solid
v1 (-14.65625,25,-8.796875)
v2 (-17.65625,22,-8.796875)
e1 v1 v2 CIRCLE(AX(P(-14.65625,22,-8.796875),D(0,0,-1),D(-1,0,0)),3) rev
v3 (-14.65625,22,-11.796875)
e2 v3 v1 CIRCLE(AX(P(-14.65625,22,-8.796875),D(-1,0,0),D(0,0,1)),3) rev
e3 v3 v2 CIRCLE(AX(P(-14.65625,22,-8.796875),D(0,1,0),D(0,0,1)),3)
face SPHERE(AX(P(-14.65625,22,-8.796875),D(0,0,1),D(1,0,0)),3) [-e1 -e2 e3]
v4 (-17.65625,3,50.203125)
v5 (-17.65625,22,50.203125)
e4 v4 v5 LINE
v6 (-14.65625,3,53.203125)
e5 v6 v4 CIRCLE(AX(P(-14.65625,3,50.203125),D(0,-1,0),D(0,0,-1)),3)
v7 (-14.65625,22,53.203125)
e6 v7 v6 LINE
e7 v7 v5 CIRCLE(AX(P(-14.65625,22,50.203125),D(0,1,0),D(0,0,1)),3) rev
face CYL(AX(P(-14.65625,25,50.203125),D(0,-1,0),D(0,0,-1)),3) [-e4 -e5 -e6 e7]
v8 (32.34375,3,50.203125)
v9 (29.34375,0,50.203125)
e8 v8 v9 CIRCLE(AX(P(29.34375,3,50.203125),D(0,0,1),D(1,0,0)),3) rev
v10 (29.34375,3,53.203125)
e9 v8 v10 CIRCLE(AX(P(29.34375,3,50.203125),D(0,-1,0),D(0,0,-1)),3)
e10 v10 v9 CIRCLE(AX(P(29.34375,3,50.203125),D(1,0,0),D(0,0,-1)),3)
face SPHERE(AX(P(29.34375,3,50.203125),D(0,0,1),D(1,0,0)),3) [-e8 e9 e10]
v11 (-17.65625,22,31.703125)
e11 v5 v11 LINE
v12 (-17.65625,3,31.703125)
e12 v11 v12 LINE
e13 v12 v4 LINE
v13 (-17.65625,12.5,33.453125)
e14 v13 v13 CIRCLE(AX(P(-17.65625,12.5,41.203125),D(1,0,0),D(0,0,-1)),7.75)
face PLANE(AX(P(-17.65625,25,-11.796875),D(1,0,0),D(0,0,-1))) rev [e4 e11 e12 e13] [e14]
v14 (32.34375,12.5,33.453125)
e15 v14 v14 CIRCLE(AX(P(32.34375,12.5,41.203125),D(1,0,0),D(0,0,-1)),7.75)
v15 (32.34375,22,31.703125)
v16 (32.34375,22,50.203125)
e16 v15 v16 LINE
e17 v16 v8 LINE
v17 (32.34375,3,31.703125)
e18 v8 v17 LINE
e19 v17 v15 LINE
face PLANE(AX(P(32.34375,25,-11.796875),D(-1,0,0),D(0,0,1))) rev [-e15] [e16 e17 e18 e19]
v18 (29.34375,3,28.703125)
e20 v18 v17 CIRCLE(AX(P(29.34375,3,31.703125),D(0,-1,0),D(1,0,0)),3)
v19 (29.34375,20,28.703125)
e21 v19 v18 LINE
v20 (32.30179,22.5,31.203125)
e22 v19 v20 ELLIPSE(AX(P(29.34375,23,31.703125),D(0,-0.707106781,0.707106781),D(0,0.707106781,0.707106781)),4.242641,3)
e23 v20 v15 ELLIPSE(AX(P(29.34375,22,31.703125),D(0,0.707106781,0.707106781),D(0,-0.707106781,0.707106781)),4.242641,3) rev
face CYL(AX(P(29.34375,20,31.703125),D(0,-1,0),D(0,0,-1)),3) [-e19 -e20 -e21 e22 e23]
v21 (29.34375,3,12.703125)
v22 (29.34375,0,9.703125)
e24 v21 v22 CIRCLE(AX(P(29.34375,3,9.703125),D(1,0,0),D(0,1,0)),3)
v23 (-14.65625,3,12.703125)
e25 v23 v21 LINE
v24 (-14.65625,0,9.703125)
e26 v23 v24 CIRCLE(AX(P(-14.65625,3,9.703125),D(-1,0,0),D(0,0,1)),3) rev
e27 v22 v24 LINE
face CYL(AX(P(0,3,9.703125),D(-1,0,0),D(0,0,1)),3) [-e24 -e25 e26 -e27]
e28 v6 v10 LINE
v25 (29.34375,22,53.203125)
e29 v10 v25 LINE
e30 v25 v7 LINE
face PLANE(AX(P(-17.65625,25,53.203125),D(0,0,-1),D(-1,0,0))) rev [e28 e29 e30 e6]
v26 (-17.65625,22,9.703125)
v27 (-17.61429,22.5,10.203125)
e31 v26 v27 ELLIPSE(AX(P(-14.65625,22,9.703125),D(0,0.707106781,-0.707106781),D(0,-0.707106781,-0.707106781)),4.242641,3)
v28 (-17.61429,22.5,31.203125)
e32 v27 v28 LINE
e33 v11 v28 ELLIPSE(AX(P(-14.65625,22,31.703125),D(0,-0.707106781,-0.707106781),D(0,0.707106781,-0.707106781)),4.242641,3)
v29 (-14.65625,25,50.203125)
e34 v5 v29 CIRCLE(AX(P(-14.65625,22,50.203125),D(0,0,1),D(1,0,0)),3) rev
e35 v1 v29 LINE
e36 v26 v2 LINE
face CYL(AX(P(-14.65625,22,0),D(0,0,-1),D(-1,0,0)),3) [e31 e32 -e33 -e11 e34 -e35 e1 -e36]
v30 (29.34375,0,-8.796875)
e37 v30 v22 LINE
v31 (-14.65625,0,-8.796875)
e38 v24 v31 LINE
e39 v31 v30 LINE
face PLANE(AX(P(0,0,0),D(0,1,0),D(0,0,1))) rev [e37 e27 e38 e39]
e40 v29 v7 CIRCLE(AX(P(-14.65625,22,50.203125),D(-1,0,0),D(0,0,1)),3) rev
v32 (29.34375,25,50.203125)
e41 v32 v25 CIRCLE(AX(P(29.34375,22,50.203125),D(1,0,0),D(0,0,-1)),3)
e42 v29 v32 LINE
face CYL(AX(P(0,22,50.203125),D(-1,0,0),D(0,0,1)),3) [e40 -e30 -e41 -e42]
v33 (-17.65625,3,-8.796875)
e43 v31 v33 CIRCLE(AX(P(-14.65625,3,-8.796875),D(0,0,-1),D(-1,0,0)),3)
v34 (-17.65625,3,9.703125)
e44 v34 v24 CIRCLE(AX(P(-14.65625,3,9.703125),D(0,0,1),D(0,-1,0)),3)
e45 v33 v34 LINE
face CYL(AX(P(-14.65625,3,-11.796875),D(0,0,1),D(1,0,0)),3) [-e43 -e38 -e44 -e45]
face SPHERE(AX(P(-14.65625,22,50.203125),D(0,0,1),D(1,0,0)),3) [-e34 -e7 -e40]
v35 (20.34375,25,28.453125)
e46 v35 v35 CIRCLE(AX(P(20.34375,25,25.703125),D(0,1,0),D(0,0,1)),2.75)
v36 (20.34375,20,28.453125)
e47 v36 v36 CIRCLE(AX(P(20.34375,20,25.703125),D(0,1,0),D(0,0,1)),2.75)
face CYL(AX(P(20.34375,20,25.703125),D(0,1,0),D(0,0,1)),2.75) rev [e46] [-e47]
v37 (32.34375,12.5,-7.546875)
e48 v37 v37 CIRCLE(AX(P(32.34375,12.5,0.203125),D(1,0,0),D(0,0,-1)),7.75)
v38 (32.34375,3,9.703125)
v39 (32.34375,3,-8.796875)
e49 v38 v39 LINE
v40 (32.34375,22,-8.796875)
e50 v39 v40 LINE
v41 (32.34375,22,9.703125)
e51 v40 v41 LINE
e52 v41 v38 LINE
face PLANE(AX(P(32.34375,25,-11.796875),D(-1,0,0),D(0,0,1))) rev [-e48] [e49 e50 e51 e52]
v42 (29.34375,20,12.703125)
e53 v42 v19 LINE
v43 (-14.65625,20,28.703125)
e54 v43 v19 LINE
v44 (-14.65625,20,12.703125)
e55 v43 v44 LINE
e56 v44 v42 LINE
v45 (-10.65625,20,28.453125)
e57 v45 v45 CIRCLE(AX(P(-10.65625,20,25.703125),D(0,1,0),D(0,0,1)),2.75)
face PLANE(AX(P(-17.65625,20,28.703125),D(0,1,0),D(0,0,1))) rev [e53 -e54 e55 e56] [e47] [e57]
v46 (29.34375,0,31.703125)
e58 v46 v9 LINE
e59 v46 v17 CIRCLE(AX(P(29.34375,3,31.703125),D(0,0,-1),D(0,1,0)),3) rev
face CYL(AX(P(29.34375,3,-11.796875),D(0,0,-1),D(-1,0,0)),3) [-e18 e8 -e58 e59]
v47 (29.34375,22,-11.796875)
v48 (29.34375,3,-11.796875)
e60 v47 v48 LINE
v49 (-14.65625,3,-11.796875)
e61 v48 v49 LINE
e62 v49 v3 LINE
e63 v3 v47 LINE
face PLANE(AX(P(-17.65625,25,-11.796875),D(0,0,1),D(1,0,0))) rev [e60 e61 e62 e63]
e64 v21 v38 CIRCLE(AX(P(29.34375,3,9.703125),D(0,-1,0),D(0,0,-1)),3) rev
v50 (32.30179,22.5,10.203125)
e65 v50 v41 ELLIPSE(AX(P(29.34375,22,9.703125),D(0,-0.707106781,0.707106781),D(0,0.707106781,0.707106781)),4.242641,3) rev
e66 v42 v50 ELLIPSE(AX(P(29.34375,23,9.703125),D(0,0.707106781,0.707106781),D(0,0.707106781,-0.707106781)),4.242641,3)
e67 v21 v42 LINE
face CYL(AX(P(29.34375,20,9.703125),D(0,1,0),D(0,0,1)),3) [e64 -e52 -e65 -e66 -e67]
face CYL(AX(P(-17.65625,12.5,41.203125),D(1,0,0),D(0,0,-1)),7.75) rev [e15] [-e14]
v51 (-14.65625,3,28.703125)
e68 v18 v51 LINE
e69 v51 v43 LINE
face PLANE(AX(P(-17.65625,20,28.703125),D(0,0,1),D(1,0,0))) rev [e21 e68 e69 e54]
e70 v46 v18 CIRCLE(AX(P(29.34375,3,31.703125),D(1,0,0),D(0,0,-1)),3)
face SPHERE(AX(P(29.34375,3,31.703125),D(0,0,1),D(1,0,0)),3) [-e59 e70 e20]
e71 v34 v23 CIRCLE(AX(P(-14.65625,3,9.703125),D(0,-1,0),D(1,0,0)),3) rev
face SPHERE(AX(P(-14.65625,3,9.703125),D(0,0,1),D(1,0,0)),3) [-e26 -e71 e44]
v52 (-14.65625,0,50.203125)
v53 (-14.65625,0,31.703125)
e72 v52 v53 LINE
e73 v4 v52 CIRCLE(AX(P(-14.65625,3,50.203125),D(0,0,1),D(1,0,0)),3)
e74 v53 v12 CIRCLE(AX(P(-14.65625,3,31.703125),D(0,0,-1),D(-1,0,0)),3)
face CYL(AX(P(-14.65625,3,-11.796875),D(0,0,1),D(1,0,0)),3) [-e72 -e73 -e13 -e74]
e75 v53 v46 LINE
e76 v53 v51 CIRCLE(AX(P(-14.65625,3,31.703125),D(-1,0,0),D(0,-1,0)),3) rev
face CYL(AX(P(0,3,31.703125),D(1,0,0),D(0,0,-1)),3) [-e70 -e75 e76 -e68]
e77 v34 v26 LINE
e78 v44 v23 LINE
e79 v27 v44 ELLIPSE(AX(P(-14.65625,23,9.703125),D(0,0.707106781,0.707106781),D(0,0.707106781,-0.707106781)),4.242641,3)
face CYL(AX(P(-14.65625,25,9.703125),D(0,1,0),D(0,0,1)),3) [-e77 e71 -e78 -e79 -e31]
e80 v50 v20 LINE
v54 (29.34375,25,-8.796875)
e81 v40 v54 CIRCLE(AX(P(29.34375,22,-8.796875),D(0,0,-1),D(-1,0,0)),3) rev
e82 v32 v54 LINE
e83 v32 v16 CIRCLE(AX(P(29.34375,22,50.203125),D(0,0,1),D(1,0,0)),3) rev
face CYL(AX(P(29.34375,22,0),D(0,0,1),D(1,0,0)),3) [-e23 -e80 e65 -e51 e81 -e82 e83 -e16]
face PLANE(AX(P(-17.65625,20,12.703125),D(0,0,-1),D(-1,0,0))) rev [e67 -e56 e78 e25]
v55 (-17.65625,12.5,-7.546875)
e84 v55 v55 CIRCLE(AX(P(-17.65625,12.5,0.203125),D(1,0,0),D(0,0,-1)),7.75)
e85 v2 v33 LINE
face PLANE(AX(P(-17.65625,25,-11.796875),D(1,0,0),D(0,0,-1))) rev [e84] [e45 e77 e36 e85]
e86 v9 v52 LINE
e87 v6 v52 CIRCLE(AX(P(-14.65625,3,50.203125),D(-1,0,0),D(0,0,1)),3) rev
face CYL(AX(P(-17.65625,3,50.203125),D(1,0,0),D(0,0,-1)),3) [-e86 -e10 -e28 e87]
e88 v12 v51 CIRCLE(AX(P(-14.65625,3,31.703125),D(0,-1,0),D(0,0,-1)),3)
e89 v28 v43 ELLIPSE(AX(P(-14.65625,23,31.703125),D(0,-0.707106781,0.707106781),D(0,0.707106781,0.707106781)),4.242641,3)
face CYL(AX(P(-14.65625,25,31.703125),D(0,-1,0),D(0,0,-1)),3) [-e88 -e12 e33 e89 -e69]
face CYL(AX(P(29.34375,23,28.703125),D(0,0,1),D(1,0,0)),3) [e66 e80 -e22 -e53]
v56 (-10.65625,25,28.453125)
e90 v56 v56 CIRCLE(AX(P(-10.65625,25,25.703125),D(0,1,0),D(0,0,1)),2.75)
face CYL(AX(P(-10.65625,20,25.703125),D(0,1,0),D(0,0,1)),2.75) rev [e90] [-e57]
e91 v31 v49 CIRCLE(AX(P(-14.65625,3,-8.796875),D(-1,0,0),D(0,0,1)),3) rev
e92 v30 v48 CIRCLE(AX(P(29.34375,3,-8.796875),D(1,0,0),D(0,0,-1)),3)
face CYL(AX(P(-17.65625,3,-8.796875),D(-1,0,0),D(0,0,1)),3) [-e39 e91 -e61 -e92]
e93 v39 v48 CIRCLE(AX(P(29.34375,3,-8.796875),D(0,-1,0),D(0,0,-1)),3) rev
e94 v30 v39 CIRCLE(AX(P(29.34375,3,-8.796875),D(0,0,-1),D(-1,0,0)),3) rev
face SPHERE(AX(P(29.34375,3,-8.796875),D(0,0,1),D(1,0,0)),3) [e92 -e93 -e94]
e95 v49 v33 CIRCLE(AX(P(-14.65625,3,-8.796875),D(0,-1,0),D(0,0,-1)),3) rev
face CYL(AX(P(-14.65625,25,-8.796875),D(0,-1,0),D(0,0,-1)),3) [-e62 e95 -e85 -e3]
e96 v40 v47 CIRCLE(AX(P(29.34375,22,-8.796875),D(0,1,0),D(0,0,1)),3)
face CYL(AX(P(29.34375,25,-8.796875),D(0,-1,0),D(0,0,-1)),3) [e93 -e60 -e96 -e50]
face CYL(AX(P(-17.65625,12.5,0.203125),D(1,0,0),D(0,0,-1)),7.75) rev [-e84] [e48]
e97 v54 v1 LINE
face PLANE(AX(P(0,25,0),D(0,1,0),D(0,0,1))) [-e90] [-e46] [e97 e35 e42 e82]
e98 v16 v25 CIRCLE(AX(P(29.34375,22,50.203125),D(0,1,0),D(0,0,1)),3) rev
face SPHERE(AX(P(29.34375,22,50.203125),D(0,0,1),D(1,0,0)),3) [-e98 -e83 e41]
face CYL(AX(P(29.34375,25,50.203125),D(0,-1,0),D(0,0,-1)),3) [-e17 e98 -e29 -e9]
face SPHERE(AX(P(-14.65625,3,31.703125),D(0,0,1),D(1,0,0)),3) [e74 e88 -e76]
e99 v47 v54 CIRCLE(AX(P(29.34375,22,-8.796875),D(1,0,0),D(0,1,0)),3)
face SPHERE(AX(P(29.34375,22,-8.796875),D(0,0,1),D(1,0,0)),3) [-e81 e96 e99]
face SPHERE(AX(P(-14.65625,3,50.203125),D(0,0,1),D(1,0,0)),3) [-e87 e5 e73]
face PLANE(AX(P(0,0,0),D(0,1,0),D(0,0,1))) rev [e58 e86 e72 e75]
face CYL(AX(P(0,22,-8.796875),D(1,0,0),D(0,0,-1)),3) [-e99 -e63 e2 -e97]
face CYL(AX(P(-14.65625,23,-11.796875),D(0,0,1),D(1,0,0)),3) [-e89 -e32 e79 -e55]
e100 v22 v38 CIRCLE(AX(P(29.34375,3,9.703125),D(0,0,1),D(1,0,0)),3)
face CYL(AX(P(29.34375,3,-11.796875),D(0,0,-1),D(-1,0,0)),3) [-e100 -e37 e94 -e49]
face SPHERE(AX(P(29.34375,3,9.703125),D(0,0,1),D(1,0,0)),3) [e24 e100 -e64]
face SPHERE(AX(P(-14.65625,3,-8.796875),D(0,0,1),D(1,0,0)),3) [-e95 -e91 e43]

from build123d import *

# Parameters (mm, degrees)
SKETCH_1_W          = 50
SKETCH_1_H          = 65
EXTRUDE_1_DEPTH     = 25
SKETCH_2_R          = 7.75
SKETCH_2_W          = 16
SKETCH_2_H          = 21.892598188
CUT_EXTRUDE_1_DEPTH = 78.172355865
SKETCH_4_R          = 2.75
CUT_EXTRUDE_3_DEPTH = 5
FILLET_1_R          = 3


with BuildPart() as part:
    # 草图1 → 凸台-拉伸1 (new body)
    with BuildSketch(Plane(origin=(0, 0, 0), x_dir=(1, 0, 0), z_dir=(0, 1, 0))):
        with Locations((7.34375, -20.703125)):
            Rectangle(SKETCH_1_W, SKETCH_1_H)
    extrude(amount=EXTRUDE_1_DEPTH)

    # 草图2 → 切除-拉伸1 (cut, through all)
    with BuildSketch(Plane(origin=(32.34375, 0, 0), x_dir=(0, 0, -1), z_dir=(1, 0, 0))):
        with Locations((-41.203125, 12.5)):
            Circle(SKETCH_2_R)
        with Locations((-0.203125, 12.5)):
            Circle(SKETCH_2_R)
        with Locations((-20.703125, 9.053700906)):
            Rectangle(SKETCH_2_W, SKETCH_2_H)
    extrude(amount=-CUT_EXTRUDE_1_DEPTH, mode=Mode.SUBTRACT)

    # 草图4 → 切除-拉伸3 (cut)
    with BuildSketch(Plane(origin=(0, 25, 0), x_dir=(1, 0, 0), z_dir=(0, 1, 0))):
        with Locations(Location((20.34375, -25.703125, 0), (0, 0, 270))):
            Circle(SKETCH_4_R)
        with Locations(Location((-10.65625, -25.703125, 0), (0, 0, 270))):
            Circle(SKETCH_4_R)
    extrude(amount=-CUT_EXTRUDE_3_DEPTH, mode=Mode.SUBTRACT)

    # 圆角1
    # the kernel refuses this fillet: 3 mm, written as the material it takes off along each edge
    with BuildSketch(Plane(origin=(29.34375, 22, -8.796875), x_dir=(1, 0, 0), z_dir=(0, 0, -1))) as fillet_1_piece_1_section:
        Polygon((0, 0), (FILLET_1_R, 0), (FILLET_1_R, -FILLET_1_R), (0, -FILLET_1_R), align=None)
    fillet_1_piece_1 = extrude(amount=FILLET_1_R, mode=Mode.PRIVATE)
    fillet_1_piece_1 = fillet_1_piece_1 - Plane(origin=(29.34375, 22, -8.796875), x_dir=(-0.7071067811865475, -0.7071067811865475, 0), z_dir=(0, 0, -1)) * Sphere(FILLET_1_R, mode=Mode.PRIVATE)
    add(fillet_1_piece_1, mode=Mode.SUBTRACT)
    with BuildSketch(Plane(origin=(29.34375, 22, 50.203125), x_dir=(1, 0, 0), z_dir=(0, 0, 1))) as fillet_1_piece_2_section:
        Polygon((0, 0), (FILLET_1_R, 0), (FILLET_1_R, FILLET_1_R), (0, FILLET_1_R), align=None)
    fillet_1_piece_2 = extrude(amount=FILLET_1_R, mode=Mode.PRIVATE)
    fillet_1_piece_2 = fillet_1_piece_2 - Plane(origin=(29.34375, 22, 50.203125), x_dir=(-0.7071067811865475, -0.7071067811865475, 0), z_dir=(0, 0, 1)) * Sphere(FILLET_1_R, mode=Mode.PRIVATE)
    add(fillet_1_piece_2, mode=Mode.SUBTRACT)
    with BuildSketch(Plane(origin=(-14.65625, 22, -8.796875), x_dir=(-1, 0, 0), z_dir=(0, 0, -1))) as fillet_1_piece_3_section:
        Polygon((0, 0), (FILLET_1_R, 0), (FILLET_1_R, FILLET_1_R), (0, FILLET_1_R), align=None)
    fillet_1_piece_3 = extrude(amount=FILLET_1_R, mode=Mode.PRIVATE)
    fillet_1_piece_3 = fillet_1_piece_3 - Plane(origin=(-14.65625, 22, -8.796875), x_dir=(0.7071067811865475, -0.7071067811865475, 0), z_dir=(0, 0, -1)) * Sphere(FILLET_1_R, mode=Mode.PRIVATE)
    add(fillet_1_piece_3, mode=Mode.SUBTRACT)
    with BuildSketch(Plane(origin=(-14.65625, 3, 50.203125), x_dir=(0, -1, 0), z_dir=(-1, 0, 0))) as fillet_1_piece_4_section:
        Polygon((0, 0), (FILLET_1_R, 0), (FILLET_1_R, FILLET_1_R), (0, FILLET_1_R), align=None)
    fillet_1_piece_4 = extrude(amount=FILLET_1_R, mode=Mode.PRIVATE)
    fillet_1_piece_4 = fillet_1_piece_4 - Plane(origin=(-14.65625, 3, 50.203125), x_dir=(0, 0.7071067811865475, -0.7071067811865475), z_dir=(-1, 0, 0)) * Sphere(FILLET_1_R, mode=Mode.PRIVATE)
    add(fillet_1_piece_4, mode=Mode.SUBTRACT)
    with BuildSketch(Plane(origin=(-14.65625, 3, 31.703125), x_dir=(0, -1, 0), z_dir=(-1, 0, 0))) as fillet_1_piece_5_section:
        Polygon((0, 0), (FILLET_1_R, 0), (FILLET_1_R, -FILLET_1_R), (0, -FILLET_1_R), align=None)
    fillet_1_piece_5 = extrude(amount=FILLET_1_R, mode=Mode.PRIVATE)
    fillet_1_piece_5 = fillet_1_piece_5 - Plane(origin=(-14.65625, 3, 31.703125), x_dir=(0, 0.7071067811865475, 0.7071067811865475), z_dir=(-1, 0, 0)) * Sphere(FILLET_1_R, mode=Mode.PRIVATE)
    add(fillet_1_piece_5, mode=Mode.SUBTRACT)
    with BuildSketch(Plane(origin=(29.34375, 3, -8.796875), x_dir=(1, 0, 0), z_dir=(0, 0, -1))) as fillet_1_piece_6_section:
        Polygon((0, 0), (FILLET_1_R, 0), (FILLET_1_R, FILLET_1_R), (0, FILLET_1_R), align=None)
    fillet_1_piece_6 = extrude(amount=FILLET_1_R, mode=Mode.PRIVATE)
    fillet_1_piece_6 = fillet_1_piece_6 - Plane(origin=(29.34375, 3, -8.796875), x_dir=(-0.7071067811865475, 0.7071067811865475, 0), z_dir=(0, 0, -1)) * Sphere(FILLET_1_R, mode=Mode.PRIVATE)
    add(fillet_1_piece_6, mode=Mode.SUBTRACT)
    with BuildSketch(Plane(origin=(29.34375, 3, 9.703125), x_dir=(1, 0, 0), z_dir=(0, 0, 1))) as fillet_1_piece_7_section:
        Polygon((0, 0), (FILLET_1_R, 0), (FILLET_1_R, -FILLET_1_R), (0, -FILLET_1_R), align=None)
    fillet_1_piece_7 = extrude(amount=FILLET_1_R, mode=Mode.PRIVATE)
    fillet_1_piece_7 = fillet_1_piece_7 - Plane(origin=(29.34375, 3, 9.703125), x_dir=(-0.7071067811865475, 0.7071067811865475, 0), z_dir=(0, 0, 1)) * Sphere(FILLET_1_R, mode=Mode.PRIVATE)
    add(fillet_1_piece_7, mode=Mode.SUBTRACT)
    with BuildSketch(Plane(origin=(29.34375, 3, 31.703125), x_dir=(0, -1, 0), z_dir=(1, 0, 0))) as fillet_1_piece_8_section:
        Polygon((0, 0), (FILLET_1_R, 0), (FILLET_1_R, FILLET_1_R), (0, FILLET_1_R), align=None)
    fillet_1_piece_8 = extrude(amount=FILLET_1_R, mode=Mode.PRIVATE)
    fillet_1_piece_8 = fillet_1_piece_8 - Plane(origin=(29.34375, 3, 31.703125), x_dir=(0, 0.7071067811865475, 0.7071067811865475), z_dir=(1, 0, 0)) * Sphere(FILLET_1_R, mode=Mode.PRIVATE)
    add(fillet_1_piece_8, mode=Mode.SUBTRACT)
    with BuildSketch(Plane(origin=(-14.65625, 3, 9.703125), x_dir=(-1, 0, 0), z_dir=(0, 0, 1))) as fillet_1_piece_9_section:
        Polygon((0, 0), (FILLET_1_R, 0), (FILLET_1_R, FILLET_1_R), (0, FILLET_1_R), align=None)
    fillet_1_piece_9 = extrude(amount=FILLET_1_R, mode=Mode.PRIVATE)
    fillet_1_piece_9 = fillet_1_piece_9 - Plane(origin=(-14.65625, 3, 9.703125), x_dir=(0.7071067811865475, 0.7071067811865475, 0), z_dir=(0, 0, 1)) * Sphere(FILLET_1_R, mode=Mode.PRIVATE)
    add(fillet_1_piece_9, mode=Mode.SUBTRACT)
    with BuildSketch(Plane(origin=(-14.65625, 22, 50.203125), x_dir=(0, 1, 0), z_dir=(-1, 0, 0))) as fillet_1_piece_10_section:
        Polygon((0, 0), (FILLET_1_R, 0), (FILLET_1_R, -FILLET_1_R), (0, -FILLET_1_R), align=None)
    fillet_1_piece_10 = extrude(amount=FILLET_1_R, mode=Mode.PRIVATE)
    fillet_1_piece_10 = fillet_1_piece_10 - Plane(origin=(-14.65625, 22, 50.203125), x_dir=(0, -0.7071067811865475, -0.7071067811865475), z_dir=(-1, 0, 0)) * Sphere(FILLET_1_R, mode=Mode.PRIVATE)
    add(fillet_1_piece_10, mode=Mode.SUBTRACT)
    with BuildSketch(Plane(origin=(-14.65625, 3, -8.796875), x_dir=(-1, 0, 0), z_dir=(0, 0, -1))) as fillet_1_piece_11_section:
        Polygon((0, 0), (FILLET_1_R, 0), (FILLET_1_R, -FILLET_1_R), (0, -FILLET_1_R), align=None)
    fillet_1_piece_11 = extrude(amount=FILLET_1_R, mode=Mode.PRIVATE)
    fillet_1_piece_11 = fillet_1_piece_11 - Plane(origin=(-14.65625, 3, -8.796875), x_dir=(0.7071067811865475, 0.7071067811865475, 0), z_dir=(0, 0, -1)) * Sphere(FILLET_1_R, mode=Mode.PRIVATE)
    add(fillet_1_piece_11, mode=Mode.SUBTRACT)
    with BuildSketch(Plane(origin=(29.34375, 3, 50.203125), x_dir=(1, 0, 0), z_dir=(0, 0, 1))) as fillet_1_piece_12_section:
        Polygon((0, 0), (FILLET_1_R, 0), (FILLET_1_R, -FILLET_1_R), (0, -FILLET_1_R), align=None)
    fillet_1_piece_12 = extrude(amount=FILLET_1_R, mode=Mode.PRIVATE)
    fillet_1_piece_12 = fillet_1_piece_12 - Plane(origin=(29.34375, 3, 50.203125), x_dir=(-0.7071067811865475, 0.7071067811865475, 0), z_dir=(0, 0, 1)) * Sphere(FILLET_1_R, mode=Mode.PRIVATE)
    add(fillet_1_piece_12, mode=Mode.SUBTRACT)
    with BuildSketch(Plane(origin=(32.34375, 25, -8.796875), x_dir=(0, -1, 0), z_dir=(0, 0, 1)), Plane(origin=(-17.65625, 25, 50.203125), x_dir=(0, -1, 0), z_dir=(0, 0, -1))) as fillet_1_piece_13:
        with BuildLine():
            CenterArc((FILLET_1_R, -FILLET_1_R), FILLET_1_R, 90, 90)
            Line((0, -FILLET_1_R), (0, 0))
            Line((0, 0), (FILLET_1_R, 0))
        make_face()
    extrude(amount=59, mode=Mode.SUBTRACT)
    with BuildSketch(Plane(origin=(-14.65625, 25, -11.796875), x_dir=(0, -1, 0), z_dir=(1, 0, 0)), Plane(origin=(-14.65625, 0, 28.703125), x_dir=(0, 0, 1), z_dir=(1, 0, 0)), Plane(origin=(29.34375, 0, 12.703125), x_dir=(0, 0, -1), z_dir=(-1, 0, 0)), Plane(origin=(29.34375, 0, 53.203125), x_dir=(0, 0, -1), z_dir=(-1, 0, 0))) as fillet_1_piece_14:
        with BuildLine():
            CenterArc((FILLET_1_R, -FILLET_1_R), FILLET_1_R, 90, 90)
            Line((0, -FILLET_1_R), (0, 0))
            Line((0, 0), (FILLET_1_R, 0))
        make_face()
    extrude(amount=44, mode=Mode.SUBTRACT)
    with BuildSketch(Plane(origin=(-17.65625, 0, 50.203125), x_dir=(0, 1, 0), z_dir=(0, 0, -1)), Plane(origin=(32.34375, 0, -8.796875), x_dir=(0, 1, 0), z_dir=(0, 0, 1)), Plane(origin=(32.34375, 0, 31.703125), x_dir=(0, 1, 0), z_dir=(0, 0, 1)), Plane(origin=(-17.65625, 0, 9.703125), x_dir=(0, 1, 0), z_dir=(0, 0, -1))) as fillet_1_piece_15:
        with BuildLine():
            CenterArc((FILLET_1_R, FILLET_1_R), FILLET_1_R, 180, 90)
            Line((0, FILLET_1_R), (0, 0))
            Line((0, 0), (FILLET_1_R, 0))
        make_face()
    extrude(amount=18.5, mode=Mode.SUBTRACT)
    with BuildSketch(Plane(origin=(-17.65625, 3, 12.703125), x_dir=(0, 0, -1), z_dir=(0, 1, 0)), Plane(origin=(-17.65625, 20, 28.703125), x_dir=(0, 0, 1), z_dir=(0, -1, 0)), Plane(origin=(32.34375, 3, 28.703125), x_dir=(0, 0, 1), z_dir=(0, 1, 0)), Plane(origin=(32.34375, 20, 12.703125), x_dir=(0, 0, -1), z_dir=(0, -1, 0))) as fillet_1_piece_16:
        with BuildLine():
            CenterArc((FILLET_1_R, -FILLET_1_R), FILLET_1_R, 90, 90)
            Line((0, -FILLET_1_R), (0, 0))
            Line((0, 0), (FILLET_1_R, 0))
        make_face()
    extrude(amount=17, mode=Mode.SUBTRACT)
    with BuildSketch(Plane(origin=(32.34375, 20, 28.703125), x_dir=(0, 1, 0), z_dir=(0, 0, -1)), Plane(origin=(-17.65625, 20, 12.703125), x_dir=(0, 1, 0), z_dir=(0, 0, 1))) as fillet_1_piece_17:
        with BuildLine():
            CenterArc((FILLET_1_R, -FILLET_1_R), FILLET_1_R, 90, 90)
            Line((0, -FILLET_1_R), (0, 0))
            Line((0, 0), (FILLET_1_R, 0))
        make_face()
    extrude(amount=16, mode=Mode.SUBTRACT)
    with BuildSketch(Plane(origin=(-14.65625, 0, -11.796875), x_dir=(0, 1, 0), z_dir=(1, 0, 0)), Plane(origin=(29.34375, 25, 53.203125), x_dir=(0, 0, -1), z_dir=(-1, 0, 0))) as fillet_1_piece_18:
        with BuildLine():
            CenterArc((FILLET_1_R, FILLET_1_R), FILLET_1_R, 180, 90)
            Line((0, FILLET_1_R), (0, 0))
            Line((0, 0), (FILLET_1_R, 0))
        make_face()
    extrude(amount=44, mode=Mode.SUBTRACT)
    with BuildSketch(Plane(origin=(-17.65625, 3, -11.796875), x_dir=(1, 0, 0), z_dir=(0, 1, 0)), Plane(origin=(-17.65625, 3, 53.203125), x_dir=(0, 0, -1), z_dir=(0, 1, 0))) as fillet_1_piece_19:
        with BuildLine():
            CenterArc((FILLET_1_R, -FILLET_1_R), FILLET_1_R, 90, 90)
            Line((0, -FILLET_1_R), (0, 0))
            Line((0, 0), (FILLET_1_R, 0))
        make_face()
    extrude(amount=19, mode=Mode.SUBTRACT)
    with BuildSketch(Plane(origin=(32.34375, 3, -11.796875), x_dir=(-1, 0, 0), z_dir=(0, 1, 0)), Plane(origin=(32.34375, 3, 53.203125), x_dir=(0, 0, -1), z_dir=(0, 1, 0))) as fillet_1_piece_20:
        with BuildLine():
            CenterArc((FILLET_1_R, FILLET_1_R), FILLET_1_R, 180, 90)
            Line((0, FILLET_1_R), (0, 0))
            Line((0, 0), (FILLET_1_R, 0))
        make_face()
    extrude(amount=19, mode=Mode.SUBTRACT)
    with BuildSketch(Plane(origin=(-17.65625, 20, 5.203125), x_dir=(0, 1, 0), z_dir=(0, 0, 1))) as fillet_1_piece_21a_section:
        with BuildLine():
            CenterArc((FILLET_1_R, -FILLET_1_R), FILLET_1_R, 90, 90)
            Line((0, -FILLET_1_R), (0, 0))
            Line((0, 0), (FILLET_1_R, 0))
        make_face()
    fillet_1_piece_21a = extrude(amount=23.5, mode=Mode.PRIVATE)
    fillet_1_piece_21a = split(fillet_1_piece_21a, bisect_by=Plane(origin=(-16.977064657, 20.679185343, 12.703125), z_dir=(0, 0, -1)), keep=Keep.TOP, mode=Mode.PRIVATE)
    with BuildSketch(Plane(origin=(-17.65625, 3, 12.703125), x_dir=(0, 0, -1), z_dir=(0, 1, 0))) as fillet_1_piece_21b_section:
        with BuildLine():
            CenterArc((FILLET_1_R, -FILLET_1_R), FILLET_1_R, 90, 90)
            Line((0, -FILLET_1_R), (0, 0))
            Line((0, 0), (FILLET_1_R, 0))
        make_face()
    fillet_1_piece_21b = extrude(amount=24.5, mode=Mode.PRIVATE)
    fillet_1_piece_21b = split(fillet_1_piece_21b, bisect_by=Plane(origin=(-16.977064657, 20, 12.023939657), z_dir=(0, 1, 0)), keep=Keep.TOP, mode=Mode.PRIVATE)
    fillet_1_piece_21 = fillet_1_piece_21a & fillet_1_piece_21b
    add(fillet_1_piece_21, mode=Mode.SUBTRACT)
    with BuildSketch(Plane(origin=(-17.65625, 27.5, 28.703125), x_dir=(0, 0, 1), z_dir=(0, -1, 0))) as fillet_1_piece_22a_section:
        with BuildLine():
            CenterArc((FILLET_1_R, -FILLET_1_R), FILLET_1_R, 90, 90)
            Line((0, -FILLET_1_R), (0, 0))
            Line((0, 0), (FILLET_1_R, 0))
        make_face()
    fillet_1_piece_22a = extrude(amount=24.5, mode=Mode.PRIVATE)
    fillet_1_piece_22a = split(fillet_1_piece_22a, bisect_by=Plane(origin=(-16.977064657, 20, 29.382310343), z_dir=(0, 1, 0)), keep=Keep.TOP, mode=Mode.PRIVATE)
    with BuildSketch(Plane(origin=(-17.65625, 20, 12.703125), x_dir=(0, 1, 0), z_dir=(0, 0, 1))) as fillet_1_piece_22b_section:
        with BuildLine():
            CenterArc((FILLET_1_R, -FILLET_1_R), FILLET_1_R, 90, 90)
            Line((0, -FILLET_1_R), (0, 0))
            Line((0, 0), (FILLET_1_R, 0))
        make_face()
    fillet_1_piece_22b = extrude(amount=23.5, mode=Mode.PRIVATE)
    fillet_1_piece_22b = split(fillet_1_piece_22b, bisect_by=Plane(origin=(-16.977064657, 20.679185343, 28.703125), z_dir=(0, 0, 1)), keep=Keep.TOP, mode=Mode.PRIVATE)
    fillet_1_piece_22 = fillet_1_piece_22a & fillet_1_piece_22b
    add(fillet_1_piece_22, mode=Mode.SUBTRACT)
    with BuildSketch(Plane(origin=(32.34375, 20, 36.203125), x_dir=(0, 1, 0), z_dir=(0, 0, -1))) as fillet_1_piece_23a_section:
        with BuildLine():
            CenterArc((FILLET_1_R, -FILLET_1_R), FILLET_1_R, 90, 90)
            Line((0, -FILLET_1_R), (0, 0))
            Line((0, 0), (FILLET_1_R, 0))
        make_face()
    fillet_1_piece_23a = extrude(amount=23.5, mode=Mode.PRIVATE)
    fillet_1_piece_23a = split(fillet_1_piece_23a, bisect_by=Plane(origin=(31.664564657, 20.679185343, 28.703125), z_dir=(0, 0, 1)), keep=Keep.TOP, mode=Mode.PRIVATE)
    with BuildSketch(Plane(origin=(32.34375, 3, 28.703125), x_dir=(0, 0, 1), z_dir=(0, 1, 0))) as fillet_1_piece_23b_section:
        with BuildLine():
            CenterArc((FILLET_1_R, -FILLET_1_R), FILLET_1_R, 90, 90)
            Line((0, -FILLET_1_R), (0, 0))
            Line((0, 0), (FILLET_1_R, 0))
        make_face()
    fillet_1_piece_23b = extrude(amount=24.5, mode=Mode.PRIVATE)
    fillet_1_piece_23b = split(fillet_1_piece_23b, bisect_by=Plane(origin=(31.664564657, 20, 29.382310343), z_dir=(0, 1, 0)), keep=Keep.TOP, mode=Mode.PRIVATE)
    fillet_1_piece_23 = fillet_1_piece_23a & fillet_1_piece_23b
    add(fillet_1_piece_23, mode=Mode.SUBTRACT)
    with BuildSketch(Plane(origin=(32.34375, 27.5, 12.703125), x_dir=(0, 0, -1), z_dir=(0, -1, 0))) as fillet_1_piece_24a_section:
        with BuildLine():
            CenterArc((FILLET_1_R, -FILLET_1_R), FILLET_1_R, 90, 90)
            Line((0, -FILLET_1_R), (0, 0))
            Line((0, 0), (FILLET_1_R, 0))
        make_face()
    fillet_1_piece_24a = extrude(amount=24.5, mode=Mode.PRIVATE)
    fillet_1_piece_24a = split(fillet_1_piece_24a, bisect_by=Plane(origin=(31.664564657, 20, 12.023939657), z_dir=(0, 1, 0)), keep=Keep.TOP, mode=Mode.PRIVATE)
    with BuildSketch(Plane(origin=(32.34375, 20, 28.703125), x_dir=(0, 1, 0), z_dir=(0, 0, -1))) as fillet_1_piece_24b_section:
        with BuildLine():
            CenterArc((FILLET_1_R, -FILLET_1_R), FILLET_1_R, 90, 90)
            Line((0, -FILLET_1_R), (0, 0))
            Line((0, 0), (FILLET_1_R, 0))
        make_face()
    fillet_1_piece_24b = extrude(amount=23.5, mode=Mode.PRIVATE)
    fillet_1_piece_24b = split(fillet_1_piece_24b, bisect_by=Plane(origin=(31.664564657, 20.679185343, 12.703125), z_dir=(0, 0, -1)), keep=Keep.TOP, mode=Mode.PRIVATE)
    fillet_1_piece_24 = fillet_1_piece_24a & fillet_1_piece_24b
    add(fillet_1_piece_24, mode=Mode.SUBTRACT)


solid = part.part
